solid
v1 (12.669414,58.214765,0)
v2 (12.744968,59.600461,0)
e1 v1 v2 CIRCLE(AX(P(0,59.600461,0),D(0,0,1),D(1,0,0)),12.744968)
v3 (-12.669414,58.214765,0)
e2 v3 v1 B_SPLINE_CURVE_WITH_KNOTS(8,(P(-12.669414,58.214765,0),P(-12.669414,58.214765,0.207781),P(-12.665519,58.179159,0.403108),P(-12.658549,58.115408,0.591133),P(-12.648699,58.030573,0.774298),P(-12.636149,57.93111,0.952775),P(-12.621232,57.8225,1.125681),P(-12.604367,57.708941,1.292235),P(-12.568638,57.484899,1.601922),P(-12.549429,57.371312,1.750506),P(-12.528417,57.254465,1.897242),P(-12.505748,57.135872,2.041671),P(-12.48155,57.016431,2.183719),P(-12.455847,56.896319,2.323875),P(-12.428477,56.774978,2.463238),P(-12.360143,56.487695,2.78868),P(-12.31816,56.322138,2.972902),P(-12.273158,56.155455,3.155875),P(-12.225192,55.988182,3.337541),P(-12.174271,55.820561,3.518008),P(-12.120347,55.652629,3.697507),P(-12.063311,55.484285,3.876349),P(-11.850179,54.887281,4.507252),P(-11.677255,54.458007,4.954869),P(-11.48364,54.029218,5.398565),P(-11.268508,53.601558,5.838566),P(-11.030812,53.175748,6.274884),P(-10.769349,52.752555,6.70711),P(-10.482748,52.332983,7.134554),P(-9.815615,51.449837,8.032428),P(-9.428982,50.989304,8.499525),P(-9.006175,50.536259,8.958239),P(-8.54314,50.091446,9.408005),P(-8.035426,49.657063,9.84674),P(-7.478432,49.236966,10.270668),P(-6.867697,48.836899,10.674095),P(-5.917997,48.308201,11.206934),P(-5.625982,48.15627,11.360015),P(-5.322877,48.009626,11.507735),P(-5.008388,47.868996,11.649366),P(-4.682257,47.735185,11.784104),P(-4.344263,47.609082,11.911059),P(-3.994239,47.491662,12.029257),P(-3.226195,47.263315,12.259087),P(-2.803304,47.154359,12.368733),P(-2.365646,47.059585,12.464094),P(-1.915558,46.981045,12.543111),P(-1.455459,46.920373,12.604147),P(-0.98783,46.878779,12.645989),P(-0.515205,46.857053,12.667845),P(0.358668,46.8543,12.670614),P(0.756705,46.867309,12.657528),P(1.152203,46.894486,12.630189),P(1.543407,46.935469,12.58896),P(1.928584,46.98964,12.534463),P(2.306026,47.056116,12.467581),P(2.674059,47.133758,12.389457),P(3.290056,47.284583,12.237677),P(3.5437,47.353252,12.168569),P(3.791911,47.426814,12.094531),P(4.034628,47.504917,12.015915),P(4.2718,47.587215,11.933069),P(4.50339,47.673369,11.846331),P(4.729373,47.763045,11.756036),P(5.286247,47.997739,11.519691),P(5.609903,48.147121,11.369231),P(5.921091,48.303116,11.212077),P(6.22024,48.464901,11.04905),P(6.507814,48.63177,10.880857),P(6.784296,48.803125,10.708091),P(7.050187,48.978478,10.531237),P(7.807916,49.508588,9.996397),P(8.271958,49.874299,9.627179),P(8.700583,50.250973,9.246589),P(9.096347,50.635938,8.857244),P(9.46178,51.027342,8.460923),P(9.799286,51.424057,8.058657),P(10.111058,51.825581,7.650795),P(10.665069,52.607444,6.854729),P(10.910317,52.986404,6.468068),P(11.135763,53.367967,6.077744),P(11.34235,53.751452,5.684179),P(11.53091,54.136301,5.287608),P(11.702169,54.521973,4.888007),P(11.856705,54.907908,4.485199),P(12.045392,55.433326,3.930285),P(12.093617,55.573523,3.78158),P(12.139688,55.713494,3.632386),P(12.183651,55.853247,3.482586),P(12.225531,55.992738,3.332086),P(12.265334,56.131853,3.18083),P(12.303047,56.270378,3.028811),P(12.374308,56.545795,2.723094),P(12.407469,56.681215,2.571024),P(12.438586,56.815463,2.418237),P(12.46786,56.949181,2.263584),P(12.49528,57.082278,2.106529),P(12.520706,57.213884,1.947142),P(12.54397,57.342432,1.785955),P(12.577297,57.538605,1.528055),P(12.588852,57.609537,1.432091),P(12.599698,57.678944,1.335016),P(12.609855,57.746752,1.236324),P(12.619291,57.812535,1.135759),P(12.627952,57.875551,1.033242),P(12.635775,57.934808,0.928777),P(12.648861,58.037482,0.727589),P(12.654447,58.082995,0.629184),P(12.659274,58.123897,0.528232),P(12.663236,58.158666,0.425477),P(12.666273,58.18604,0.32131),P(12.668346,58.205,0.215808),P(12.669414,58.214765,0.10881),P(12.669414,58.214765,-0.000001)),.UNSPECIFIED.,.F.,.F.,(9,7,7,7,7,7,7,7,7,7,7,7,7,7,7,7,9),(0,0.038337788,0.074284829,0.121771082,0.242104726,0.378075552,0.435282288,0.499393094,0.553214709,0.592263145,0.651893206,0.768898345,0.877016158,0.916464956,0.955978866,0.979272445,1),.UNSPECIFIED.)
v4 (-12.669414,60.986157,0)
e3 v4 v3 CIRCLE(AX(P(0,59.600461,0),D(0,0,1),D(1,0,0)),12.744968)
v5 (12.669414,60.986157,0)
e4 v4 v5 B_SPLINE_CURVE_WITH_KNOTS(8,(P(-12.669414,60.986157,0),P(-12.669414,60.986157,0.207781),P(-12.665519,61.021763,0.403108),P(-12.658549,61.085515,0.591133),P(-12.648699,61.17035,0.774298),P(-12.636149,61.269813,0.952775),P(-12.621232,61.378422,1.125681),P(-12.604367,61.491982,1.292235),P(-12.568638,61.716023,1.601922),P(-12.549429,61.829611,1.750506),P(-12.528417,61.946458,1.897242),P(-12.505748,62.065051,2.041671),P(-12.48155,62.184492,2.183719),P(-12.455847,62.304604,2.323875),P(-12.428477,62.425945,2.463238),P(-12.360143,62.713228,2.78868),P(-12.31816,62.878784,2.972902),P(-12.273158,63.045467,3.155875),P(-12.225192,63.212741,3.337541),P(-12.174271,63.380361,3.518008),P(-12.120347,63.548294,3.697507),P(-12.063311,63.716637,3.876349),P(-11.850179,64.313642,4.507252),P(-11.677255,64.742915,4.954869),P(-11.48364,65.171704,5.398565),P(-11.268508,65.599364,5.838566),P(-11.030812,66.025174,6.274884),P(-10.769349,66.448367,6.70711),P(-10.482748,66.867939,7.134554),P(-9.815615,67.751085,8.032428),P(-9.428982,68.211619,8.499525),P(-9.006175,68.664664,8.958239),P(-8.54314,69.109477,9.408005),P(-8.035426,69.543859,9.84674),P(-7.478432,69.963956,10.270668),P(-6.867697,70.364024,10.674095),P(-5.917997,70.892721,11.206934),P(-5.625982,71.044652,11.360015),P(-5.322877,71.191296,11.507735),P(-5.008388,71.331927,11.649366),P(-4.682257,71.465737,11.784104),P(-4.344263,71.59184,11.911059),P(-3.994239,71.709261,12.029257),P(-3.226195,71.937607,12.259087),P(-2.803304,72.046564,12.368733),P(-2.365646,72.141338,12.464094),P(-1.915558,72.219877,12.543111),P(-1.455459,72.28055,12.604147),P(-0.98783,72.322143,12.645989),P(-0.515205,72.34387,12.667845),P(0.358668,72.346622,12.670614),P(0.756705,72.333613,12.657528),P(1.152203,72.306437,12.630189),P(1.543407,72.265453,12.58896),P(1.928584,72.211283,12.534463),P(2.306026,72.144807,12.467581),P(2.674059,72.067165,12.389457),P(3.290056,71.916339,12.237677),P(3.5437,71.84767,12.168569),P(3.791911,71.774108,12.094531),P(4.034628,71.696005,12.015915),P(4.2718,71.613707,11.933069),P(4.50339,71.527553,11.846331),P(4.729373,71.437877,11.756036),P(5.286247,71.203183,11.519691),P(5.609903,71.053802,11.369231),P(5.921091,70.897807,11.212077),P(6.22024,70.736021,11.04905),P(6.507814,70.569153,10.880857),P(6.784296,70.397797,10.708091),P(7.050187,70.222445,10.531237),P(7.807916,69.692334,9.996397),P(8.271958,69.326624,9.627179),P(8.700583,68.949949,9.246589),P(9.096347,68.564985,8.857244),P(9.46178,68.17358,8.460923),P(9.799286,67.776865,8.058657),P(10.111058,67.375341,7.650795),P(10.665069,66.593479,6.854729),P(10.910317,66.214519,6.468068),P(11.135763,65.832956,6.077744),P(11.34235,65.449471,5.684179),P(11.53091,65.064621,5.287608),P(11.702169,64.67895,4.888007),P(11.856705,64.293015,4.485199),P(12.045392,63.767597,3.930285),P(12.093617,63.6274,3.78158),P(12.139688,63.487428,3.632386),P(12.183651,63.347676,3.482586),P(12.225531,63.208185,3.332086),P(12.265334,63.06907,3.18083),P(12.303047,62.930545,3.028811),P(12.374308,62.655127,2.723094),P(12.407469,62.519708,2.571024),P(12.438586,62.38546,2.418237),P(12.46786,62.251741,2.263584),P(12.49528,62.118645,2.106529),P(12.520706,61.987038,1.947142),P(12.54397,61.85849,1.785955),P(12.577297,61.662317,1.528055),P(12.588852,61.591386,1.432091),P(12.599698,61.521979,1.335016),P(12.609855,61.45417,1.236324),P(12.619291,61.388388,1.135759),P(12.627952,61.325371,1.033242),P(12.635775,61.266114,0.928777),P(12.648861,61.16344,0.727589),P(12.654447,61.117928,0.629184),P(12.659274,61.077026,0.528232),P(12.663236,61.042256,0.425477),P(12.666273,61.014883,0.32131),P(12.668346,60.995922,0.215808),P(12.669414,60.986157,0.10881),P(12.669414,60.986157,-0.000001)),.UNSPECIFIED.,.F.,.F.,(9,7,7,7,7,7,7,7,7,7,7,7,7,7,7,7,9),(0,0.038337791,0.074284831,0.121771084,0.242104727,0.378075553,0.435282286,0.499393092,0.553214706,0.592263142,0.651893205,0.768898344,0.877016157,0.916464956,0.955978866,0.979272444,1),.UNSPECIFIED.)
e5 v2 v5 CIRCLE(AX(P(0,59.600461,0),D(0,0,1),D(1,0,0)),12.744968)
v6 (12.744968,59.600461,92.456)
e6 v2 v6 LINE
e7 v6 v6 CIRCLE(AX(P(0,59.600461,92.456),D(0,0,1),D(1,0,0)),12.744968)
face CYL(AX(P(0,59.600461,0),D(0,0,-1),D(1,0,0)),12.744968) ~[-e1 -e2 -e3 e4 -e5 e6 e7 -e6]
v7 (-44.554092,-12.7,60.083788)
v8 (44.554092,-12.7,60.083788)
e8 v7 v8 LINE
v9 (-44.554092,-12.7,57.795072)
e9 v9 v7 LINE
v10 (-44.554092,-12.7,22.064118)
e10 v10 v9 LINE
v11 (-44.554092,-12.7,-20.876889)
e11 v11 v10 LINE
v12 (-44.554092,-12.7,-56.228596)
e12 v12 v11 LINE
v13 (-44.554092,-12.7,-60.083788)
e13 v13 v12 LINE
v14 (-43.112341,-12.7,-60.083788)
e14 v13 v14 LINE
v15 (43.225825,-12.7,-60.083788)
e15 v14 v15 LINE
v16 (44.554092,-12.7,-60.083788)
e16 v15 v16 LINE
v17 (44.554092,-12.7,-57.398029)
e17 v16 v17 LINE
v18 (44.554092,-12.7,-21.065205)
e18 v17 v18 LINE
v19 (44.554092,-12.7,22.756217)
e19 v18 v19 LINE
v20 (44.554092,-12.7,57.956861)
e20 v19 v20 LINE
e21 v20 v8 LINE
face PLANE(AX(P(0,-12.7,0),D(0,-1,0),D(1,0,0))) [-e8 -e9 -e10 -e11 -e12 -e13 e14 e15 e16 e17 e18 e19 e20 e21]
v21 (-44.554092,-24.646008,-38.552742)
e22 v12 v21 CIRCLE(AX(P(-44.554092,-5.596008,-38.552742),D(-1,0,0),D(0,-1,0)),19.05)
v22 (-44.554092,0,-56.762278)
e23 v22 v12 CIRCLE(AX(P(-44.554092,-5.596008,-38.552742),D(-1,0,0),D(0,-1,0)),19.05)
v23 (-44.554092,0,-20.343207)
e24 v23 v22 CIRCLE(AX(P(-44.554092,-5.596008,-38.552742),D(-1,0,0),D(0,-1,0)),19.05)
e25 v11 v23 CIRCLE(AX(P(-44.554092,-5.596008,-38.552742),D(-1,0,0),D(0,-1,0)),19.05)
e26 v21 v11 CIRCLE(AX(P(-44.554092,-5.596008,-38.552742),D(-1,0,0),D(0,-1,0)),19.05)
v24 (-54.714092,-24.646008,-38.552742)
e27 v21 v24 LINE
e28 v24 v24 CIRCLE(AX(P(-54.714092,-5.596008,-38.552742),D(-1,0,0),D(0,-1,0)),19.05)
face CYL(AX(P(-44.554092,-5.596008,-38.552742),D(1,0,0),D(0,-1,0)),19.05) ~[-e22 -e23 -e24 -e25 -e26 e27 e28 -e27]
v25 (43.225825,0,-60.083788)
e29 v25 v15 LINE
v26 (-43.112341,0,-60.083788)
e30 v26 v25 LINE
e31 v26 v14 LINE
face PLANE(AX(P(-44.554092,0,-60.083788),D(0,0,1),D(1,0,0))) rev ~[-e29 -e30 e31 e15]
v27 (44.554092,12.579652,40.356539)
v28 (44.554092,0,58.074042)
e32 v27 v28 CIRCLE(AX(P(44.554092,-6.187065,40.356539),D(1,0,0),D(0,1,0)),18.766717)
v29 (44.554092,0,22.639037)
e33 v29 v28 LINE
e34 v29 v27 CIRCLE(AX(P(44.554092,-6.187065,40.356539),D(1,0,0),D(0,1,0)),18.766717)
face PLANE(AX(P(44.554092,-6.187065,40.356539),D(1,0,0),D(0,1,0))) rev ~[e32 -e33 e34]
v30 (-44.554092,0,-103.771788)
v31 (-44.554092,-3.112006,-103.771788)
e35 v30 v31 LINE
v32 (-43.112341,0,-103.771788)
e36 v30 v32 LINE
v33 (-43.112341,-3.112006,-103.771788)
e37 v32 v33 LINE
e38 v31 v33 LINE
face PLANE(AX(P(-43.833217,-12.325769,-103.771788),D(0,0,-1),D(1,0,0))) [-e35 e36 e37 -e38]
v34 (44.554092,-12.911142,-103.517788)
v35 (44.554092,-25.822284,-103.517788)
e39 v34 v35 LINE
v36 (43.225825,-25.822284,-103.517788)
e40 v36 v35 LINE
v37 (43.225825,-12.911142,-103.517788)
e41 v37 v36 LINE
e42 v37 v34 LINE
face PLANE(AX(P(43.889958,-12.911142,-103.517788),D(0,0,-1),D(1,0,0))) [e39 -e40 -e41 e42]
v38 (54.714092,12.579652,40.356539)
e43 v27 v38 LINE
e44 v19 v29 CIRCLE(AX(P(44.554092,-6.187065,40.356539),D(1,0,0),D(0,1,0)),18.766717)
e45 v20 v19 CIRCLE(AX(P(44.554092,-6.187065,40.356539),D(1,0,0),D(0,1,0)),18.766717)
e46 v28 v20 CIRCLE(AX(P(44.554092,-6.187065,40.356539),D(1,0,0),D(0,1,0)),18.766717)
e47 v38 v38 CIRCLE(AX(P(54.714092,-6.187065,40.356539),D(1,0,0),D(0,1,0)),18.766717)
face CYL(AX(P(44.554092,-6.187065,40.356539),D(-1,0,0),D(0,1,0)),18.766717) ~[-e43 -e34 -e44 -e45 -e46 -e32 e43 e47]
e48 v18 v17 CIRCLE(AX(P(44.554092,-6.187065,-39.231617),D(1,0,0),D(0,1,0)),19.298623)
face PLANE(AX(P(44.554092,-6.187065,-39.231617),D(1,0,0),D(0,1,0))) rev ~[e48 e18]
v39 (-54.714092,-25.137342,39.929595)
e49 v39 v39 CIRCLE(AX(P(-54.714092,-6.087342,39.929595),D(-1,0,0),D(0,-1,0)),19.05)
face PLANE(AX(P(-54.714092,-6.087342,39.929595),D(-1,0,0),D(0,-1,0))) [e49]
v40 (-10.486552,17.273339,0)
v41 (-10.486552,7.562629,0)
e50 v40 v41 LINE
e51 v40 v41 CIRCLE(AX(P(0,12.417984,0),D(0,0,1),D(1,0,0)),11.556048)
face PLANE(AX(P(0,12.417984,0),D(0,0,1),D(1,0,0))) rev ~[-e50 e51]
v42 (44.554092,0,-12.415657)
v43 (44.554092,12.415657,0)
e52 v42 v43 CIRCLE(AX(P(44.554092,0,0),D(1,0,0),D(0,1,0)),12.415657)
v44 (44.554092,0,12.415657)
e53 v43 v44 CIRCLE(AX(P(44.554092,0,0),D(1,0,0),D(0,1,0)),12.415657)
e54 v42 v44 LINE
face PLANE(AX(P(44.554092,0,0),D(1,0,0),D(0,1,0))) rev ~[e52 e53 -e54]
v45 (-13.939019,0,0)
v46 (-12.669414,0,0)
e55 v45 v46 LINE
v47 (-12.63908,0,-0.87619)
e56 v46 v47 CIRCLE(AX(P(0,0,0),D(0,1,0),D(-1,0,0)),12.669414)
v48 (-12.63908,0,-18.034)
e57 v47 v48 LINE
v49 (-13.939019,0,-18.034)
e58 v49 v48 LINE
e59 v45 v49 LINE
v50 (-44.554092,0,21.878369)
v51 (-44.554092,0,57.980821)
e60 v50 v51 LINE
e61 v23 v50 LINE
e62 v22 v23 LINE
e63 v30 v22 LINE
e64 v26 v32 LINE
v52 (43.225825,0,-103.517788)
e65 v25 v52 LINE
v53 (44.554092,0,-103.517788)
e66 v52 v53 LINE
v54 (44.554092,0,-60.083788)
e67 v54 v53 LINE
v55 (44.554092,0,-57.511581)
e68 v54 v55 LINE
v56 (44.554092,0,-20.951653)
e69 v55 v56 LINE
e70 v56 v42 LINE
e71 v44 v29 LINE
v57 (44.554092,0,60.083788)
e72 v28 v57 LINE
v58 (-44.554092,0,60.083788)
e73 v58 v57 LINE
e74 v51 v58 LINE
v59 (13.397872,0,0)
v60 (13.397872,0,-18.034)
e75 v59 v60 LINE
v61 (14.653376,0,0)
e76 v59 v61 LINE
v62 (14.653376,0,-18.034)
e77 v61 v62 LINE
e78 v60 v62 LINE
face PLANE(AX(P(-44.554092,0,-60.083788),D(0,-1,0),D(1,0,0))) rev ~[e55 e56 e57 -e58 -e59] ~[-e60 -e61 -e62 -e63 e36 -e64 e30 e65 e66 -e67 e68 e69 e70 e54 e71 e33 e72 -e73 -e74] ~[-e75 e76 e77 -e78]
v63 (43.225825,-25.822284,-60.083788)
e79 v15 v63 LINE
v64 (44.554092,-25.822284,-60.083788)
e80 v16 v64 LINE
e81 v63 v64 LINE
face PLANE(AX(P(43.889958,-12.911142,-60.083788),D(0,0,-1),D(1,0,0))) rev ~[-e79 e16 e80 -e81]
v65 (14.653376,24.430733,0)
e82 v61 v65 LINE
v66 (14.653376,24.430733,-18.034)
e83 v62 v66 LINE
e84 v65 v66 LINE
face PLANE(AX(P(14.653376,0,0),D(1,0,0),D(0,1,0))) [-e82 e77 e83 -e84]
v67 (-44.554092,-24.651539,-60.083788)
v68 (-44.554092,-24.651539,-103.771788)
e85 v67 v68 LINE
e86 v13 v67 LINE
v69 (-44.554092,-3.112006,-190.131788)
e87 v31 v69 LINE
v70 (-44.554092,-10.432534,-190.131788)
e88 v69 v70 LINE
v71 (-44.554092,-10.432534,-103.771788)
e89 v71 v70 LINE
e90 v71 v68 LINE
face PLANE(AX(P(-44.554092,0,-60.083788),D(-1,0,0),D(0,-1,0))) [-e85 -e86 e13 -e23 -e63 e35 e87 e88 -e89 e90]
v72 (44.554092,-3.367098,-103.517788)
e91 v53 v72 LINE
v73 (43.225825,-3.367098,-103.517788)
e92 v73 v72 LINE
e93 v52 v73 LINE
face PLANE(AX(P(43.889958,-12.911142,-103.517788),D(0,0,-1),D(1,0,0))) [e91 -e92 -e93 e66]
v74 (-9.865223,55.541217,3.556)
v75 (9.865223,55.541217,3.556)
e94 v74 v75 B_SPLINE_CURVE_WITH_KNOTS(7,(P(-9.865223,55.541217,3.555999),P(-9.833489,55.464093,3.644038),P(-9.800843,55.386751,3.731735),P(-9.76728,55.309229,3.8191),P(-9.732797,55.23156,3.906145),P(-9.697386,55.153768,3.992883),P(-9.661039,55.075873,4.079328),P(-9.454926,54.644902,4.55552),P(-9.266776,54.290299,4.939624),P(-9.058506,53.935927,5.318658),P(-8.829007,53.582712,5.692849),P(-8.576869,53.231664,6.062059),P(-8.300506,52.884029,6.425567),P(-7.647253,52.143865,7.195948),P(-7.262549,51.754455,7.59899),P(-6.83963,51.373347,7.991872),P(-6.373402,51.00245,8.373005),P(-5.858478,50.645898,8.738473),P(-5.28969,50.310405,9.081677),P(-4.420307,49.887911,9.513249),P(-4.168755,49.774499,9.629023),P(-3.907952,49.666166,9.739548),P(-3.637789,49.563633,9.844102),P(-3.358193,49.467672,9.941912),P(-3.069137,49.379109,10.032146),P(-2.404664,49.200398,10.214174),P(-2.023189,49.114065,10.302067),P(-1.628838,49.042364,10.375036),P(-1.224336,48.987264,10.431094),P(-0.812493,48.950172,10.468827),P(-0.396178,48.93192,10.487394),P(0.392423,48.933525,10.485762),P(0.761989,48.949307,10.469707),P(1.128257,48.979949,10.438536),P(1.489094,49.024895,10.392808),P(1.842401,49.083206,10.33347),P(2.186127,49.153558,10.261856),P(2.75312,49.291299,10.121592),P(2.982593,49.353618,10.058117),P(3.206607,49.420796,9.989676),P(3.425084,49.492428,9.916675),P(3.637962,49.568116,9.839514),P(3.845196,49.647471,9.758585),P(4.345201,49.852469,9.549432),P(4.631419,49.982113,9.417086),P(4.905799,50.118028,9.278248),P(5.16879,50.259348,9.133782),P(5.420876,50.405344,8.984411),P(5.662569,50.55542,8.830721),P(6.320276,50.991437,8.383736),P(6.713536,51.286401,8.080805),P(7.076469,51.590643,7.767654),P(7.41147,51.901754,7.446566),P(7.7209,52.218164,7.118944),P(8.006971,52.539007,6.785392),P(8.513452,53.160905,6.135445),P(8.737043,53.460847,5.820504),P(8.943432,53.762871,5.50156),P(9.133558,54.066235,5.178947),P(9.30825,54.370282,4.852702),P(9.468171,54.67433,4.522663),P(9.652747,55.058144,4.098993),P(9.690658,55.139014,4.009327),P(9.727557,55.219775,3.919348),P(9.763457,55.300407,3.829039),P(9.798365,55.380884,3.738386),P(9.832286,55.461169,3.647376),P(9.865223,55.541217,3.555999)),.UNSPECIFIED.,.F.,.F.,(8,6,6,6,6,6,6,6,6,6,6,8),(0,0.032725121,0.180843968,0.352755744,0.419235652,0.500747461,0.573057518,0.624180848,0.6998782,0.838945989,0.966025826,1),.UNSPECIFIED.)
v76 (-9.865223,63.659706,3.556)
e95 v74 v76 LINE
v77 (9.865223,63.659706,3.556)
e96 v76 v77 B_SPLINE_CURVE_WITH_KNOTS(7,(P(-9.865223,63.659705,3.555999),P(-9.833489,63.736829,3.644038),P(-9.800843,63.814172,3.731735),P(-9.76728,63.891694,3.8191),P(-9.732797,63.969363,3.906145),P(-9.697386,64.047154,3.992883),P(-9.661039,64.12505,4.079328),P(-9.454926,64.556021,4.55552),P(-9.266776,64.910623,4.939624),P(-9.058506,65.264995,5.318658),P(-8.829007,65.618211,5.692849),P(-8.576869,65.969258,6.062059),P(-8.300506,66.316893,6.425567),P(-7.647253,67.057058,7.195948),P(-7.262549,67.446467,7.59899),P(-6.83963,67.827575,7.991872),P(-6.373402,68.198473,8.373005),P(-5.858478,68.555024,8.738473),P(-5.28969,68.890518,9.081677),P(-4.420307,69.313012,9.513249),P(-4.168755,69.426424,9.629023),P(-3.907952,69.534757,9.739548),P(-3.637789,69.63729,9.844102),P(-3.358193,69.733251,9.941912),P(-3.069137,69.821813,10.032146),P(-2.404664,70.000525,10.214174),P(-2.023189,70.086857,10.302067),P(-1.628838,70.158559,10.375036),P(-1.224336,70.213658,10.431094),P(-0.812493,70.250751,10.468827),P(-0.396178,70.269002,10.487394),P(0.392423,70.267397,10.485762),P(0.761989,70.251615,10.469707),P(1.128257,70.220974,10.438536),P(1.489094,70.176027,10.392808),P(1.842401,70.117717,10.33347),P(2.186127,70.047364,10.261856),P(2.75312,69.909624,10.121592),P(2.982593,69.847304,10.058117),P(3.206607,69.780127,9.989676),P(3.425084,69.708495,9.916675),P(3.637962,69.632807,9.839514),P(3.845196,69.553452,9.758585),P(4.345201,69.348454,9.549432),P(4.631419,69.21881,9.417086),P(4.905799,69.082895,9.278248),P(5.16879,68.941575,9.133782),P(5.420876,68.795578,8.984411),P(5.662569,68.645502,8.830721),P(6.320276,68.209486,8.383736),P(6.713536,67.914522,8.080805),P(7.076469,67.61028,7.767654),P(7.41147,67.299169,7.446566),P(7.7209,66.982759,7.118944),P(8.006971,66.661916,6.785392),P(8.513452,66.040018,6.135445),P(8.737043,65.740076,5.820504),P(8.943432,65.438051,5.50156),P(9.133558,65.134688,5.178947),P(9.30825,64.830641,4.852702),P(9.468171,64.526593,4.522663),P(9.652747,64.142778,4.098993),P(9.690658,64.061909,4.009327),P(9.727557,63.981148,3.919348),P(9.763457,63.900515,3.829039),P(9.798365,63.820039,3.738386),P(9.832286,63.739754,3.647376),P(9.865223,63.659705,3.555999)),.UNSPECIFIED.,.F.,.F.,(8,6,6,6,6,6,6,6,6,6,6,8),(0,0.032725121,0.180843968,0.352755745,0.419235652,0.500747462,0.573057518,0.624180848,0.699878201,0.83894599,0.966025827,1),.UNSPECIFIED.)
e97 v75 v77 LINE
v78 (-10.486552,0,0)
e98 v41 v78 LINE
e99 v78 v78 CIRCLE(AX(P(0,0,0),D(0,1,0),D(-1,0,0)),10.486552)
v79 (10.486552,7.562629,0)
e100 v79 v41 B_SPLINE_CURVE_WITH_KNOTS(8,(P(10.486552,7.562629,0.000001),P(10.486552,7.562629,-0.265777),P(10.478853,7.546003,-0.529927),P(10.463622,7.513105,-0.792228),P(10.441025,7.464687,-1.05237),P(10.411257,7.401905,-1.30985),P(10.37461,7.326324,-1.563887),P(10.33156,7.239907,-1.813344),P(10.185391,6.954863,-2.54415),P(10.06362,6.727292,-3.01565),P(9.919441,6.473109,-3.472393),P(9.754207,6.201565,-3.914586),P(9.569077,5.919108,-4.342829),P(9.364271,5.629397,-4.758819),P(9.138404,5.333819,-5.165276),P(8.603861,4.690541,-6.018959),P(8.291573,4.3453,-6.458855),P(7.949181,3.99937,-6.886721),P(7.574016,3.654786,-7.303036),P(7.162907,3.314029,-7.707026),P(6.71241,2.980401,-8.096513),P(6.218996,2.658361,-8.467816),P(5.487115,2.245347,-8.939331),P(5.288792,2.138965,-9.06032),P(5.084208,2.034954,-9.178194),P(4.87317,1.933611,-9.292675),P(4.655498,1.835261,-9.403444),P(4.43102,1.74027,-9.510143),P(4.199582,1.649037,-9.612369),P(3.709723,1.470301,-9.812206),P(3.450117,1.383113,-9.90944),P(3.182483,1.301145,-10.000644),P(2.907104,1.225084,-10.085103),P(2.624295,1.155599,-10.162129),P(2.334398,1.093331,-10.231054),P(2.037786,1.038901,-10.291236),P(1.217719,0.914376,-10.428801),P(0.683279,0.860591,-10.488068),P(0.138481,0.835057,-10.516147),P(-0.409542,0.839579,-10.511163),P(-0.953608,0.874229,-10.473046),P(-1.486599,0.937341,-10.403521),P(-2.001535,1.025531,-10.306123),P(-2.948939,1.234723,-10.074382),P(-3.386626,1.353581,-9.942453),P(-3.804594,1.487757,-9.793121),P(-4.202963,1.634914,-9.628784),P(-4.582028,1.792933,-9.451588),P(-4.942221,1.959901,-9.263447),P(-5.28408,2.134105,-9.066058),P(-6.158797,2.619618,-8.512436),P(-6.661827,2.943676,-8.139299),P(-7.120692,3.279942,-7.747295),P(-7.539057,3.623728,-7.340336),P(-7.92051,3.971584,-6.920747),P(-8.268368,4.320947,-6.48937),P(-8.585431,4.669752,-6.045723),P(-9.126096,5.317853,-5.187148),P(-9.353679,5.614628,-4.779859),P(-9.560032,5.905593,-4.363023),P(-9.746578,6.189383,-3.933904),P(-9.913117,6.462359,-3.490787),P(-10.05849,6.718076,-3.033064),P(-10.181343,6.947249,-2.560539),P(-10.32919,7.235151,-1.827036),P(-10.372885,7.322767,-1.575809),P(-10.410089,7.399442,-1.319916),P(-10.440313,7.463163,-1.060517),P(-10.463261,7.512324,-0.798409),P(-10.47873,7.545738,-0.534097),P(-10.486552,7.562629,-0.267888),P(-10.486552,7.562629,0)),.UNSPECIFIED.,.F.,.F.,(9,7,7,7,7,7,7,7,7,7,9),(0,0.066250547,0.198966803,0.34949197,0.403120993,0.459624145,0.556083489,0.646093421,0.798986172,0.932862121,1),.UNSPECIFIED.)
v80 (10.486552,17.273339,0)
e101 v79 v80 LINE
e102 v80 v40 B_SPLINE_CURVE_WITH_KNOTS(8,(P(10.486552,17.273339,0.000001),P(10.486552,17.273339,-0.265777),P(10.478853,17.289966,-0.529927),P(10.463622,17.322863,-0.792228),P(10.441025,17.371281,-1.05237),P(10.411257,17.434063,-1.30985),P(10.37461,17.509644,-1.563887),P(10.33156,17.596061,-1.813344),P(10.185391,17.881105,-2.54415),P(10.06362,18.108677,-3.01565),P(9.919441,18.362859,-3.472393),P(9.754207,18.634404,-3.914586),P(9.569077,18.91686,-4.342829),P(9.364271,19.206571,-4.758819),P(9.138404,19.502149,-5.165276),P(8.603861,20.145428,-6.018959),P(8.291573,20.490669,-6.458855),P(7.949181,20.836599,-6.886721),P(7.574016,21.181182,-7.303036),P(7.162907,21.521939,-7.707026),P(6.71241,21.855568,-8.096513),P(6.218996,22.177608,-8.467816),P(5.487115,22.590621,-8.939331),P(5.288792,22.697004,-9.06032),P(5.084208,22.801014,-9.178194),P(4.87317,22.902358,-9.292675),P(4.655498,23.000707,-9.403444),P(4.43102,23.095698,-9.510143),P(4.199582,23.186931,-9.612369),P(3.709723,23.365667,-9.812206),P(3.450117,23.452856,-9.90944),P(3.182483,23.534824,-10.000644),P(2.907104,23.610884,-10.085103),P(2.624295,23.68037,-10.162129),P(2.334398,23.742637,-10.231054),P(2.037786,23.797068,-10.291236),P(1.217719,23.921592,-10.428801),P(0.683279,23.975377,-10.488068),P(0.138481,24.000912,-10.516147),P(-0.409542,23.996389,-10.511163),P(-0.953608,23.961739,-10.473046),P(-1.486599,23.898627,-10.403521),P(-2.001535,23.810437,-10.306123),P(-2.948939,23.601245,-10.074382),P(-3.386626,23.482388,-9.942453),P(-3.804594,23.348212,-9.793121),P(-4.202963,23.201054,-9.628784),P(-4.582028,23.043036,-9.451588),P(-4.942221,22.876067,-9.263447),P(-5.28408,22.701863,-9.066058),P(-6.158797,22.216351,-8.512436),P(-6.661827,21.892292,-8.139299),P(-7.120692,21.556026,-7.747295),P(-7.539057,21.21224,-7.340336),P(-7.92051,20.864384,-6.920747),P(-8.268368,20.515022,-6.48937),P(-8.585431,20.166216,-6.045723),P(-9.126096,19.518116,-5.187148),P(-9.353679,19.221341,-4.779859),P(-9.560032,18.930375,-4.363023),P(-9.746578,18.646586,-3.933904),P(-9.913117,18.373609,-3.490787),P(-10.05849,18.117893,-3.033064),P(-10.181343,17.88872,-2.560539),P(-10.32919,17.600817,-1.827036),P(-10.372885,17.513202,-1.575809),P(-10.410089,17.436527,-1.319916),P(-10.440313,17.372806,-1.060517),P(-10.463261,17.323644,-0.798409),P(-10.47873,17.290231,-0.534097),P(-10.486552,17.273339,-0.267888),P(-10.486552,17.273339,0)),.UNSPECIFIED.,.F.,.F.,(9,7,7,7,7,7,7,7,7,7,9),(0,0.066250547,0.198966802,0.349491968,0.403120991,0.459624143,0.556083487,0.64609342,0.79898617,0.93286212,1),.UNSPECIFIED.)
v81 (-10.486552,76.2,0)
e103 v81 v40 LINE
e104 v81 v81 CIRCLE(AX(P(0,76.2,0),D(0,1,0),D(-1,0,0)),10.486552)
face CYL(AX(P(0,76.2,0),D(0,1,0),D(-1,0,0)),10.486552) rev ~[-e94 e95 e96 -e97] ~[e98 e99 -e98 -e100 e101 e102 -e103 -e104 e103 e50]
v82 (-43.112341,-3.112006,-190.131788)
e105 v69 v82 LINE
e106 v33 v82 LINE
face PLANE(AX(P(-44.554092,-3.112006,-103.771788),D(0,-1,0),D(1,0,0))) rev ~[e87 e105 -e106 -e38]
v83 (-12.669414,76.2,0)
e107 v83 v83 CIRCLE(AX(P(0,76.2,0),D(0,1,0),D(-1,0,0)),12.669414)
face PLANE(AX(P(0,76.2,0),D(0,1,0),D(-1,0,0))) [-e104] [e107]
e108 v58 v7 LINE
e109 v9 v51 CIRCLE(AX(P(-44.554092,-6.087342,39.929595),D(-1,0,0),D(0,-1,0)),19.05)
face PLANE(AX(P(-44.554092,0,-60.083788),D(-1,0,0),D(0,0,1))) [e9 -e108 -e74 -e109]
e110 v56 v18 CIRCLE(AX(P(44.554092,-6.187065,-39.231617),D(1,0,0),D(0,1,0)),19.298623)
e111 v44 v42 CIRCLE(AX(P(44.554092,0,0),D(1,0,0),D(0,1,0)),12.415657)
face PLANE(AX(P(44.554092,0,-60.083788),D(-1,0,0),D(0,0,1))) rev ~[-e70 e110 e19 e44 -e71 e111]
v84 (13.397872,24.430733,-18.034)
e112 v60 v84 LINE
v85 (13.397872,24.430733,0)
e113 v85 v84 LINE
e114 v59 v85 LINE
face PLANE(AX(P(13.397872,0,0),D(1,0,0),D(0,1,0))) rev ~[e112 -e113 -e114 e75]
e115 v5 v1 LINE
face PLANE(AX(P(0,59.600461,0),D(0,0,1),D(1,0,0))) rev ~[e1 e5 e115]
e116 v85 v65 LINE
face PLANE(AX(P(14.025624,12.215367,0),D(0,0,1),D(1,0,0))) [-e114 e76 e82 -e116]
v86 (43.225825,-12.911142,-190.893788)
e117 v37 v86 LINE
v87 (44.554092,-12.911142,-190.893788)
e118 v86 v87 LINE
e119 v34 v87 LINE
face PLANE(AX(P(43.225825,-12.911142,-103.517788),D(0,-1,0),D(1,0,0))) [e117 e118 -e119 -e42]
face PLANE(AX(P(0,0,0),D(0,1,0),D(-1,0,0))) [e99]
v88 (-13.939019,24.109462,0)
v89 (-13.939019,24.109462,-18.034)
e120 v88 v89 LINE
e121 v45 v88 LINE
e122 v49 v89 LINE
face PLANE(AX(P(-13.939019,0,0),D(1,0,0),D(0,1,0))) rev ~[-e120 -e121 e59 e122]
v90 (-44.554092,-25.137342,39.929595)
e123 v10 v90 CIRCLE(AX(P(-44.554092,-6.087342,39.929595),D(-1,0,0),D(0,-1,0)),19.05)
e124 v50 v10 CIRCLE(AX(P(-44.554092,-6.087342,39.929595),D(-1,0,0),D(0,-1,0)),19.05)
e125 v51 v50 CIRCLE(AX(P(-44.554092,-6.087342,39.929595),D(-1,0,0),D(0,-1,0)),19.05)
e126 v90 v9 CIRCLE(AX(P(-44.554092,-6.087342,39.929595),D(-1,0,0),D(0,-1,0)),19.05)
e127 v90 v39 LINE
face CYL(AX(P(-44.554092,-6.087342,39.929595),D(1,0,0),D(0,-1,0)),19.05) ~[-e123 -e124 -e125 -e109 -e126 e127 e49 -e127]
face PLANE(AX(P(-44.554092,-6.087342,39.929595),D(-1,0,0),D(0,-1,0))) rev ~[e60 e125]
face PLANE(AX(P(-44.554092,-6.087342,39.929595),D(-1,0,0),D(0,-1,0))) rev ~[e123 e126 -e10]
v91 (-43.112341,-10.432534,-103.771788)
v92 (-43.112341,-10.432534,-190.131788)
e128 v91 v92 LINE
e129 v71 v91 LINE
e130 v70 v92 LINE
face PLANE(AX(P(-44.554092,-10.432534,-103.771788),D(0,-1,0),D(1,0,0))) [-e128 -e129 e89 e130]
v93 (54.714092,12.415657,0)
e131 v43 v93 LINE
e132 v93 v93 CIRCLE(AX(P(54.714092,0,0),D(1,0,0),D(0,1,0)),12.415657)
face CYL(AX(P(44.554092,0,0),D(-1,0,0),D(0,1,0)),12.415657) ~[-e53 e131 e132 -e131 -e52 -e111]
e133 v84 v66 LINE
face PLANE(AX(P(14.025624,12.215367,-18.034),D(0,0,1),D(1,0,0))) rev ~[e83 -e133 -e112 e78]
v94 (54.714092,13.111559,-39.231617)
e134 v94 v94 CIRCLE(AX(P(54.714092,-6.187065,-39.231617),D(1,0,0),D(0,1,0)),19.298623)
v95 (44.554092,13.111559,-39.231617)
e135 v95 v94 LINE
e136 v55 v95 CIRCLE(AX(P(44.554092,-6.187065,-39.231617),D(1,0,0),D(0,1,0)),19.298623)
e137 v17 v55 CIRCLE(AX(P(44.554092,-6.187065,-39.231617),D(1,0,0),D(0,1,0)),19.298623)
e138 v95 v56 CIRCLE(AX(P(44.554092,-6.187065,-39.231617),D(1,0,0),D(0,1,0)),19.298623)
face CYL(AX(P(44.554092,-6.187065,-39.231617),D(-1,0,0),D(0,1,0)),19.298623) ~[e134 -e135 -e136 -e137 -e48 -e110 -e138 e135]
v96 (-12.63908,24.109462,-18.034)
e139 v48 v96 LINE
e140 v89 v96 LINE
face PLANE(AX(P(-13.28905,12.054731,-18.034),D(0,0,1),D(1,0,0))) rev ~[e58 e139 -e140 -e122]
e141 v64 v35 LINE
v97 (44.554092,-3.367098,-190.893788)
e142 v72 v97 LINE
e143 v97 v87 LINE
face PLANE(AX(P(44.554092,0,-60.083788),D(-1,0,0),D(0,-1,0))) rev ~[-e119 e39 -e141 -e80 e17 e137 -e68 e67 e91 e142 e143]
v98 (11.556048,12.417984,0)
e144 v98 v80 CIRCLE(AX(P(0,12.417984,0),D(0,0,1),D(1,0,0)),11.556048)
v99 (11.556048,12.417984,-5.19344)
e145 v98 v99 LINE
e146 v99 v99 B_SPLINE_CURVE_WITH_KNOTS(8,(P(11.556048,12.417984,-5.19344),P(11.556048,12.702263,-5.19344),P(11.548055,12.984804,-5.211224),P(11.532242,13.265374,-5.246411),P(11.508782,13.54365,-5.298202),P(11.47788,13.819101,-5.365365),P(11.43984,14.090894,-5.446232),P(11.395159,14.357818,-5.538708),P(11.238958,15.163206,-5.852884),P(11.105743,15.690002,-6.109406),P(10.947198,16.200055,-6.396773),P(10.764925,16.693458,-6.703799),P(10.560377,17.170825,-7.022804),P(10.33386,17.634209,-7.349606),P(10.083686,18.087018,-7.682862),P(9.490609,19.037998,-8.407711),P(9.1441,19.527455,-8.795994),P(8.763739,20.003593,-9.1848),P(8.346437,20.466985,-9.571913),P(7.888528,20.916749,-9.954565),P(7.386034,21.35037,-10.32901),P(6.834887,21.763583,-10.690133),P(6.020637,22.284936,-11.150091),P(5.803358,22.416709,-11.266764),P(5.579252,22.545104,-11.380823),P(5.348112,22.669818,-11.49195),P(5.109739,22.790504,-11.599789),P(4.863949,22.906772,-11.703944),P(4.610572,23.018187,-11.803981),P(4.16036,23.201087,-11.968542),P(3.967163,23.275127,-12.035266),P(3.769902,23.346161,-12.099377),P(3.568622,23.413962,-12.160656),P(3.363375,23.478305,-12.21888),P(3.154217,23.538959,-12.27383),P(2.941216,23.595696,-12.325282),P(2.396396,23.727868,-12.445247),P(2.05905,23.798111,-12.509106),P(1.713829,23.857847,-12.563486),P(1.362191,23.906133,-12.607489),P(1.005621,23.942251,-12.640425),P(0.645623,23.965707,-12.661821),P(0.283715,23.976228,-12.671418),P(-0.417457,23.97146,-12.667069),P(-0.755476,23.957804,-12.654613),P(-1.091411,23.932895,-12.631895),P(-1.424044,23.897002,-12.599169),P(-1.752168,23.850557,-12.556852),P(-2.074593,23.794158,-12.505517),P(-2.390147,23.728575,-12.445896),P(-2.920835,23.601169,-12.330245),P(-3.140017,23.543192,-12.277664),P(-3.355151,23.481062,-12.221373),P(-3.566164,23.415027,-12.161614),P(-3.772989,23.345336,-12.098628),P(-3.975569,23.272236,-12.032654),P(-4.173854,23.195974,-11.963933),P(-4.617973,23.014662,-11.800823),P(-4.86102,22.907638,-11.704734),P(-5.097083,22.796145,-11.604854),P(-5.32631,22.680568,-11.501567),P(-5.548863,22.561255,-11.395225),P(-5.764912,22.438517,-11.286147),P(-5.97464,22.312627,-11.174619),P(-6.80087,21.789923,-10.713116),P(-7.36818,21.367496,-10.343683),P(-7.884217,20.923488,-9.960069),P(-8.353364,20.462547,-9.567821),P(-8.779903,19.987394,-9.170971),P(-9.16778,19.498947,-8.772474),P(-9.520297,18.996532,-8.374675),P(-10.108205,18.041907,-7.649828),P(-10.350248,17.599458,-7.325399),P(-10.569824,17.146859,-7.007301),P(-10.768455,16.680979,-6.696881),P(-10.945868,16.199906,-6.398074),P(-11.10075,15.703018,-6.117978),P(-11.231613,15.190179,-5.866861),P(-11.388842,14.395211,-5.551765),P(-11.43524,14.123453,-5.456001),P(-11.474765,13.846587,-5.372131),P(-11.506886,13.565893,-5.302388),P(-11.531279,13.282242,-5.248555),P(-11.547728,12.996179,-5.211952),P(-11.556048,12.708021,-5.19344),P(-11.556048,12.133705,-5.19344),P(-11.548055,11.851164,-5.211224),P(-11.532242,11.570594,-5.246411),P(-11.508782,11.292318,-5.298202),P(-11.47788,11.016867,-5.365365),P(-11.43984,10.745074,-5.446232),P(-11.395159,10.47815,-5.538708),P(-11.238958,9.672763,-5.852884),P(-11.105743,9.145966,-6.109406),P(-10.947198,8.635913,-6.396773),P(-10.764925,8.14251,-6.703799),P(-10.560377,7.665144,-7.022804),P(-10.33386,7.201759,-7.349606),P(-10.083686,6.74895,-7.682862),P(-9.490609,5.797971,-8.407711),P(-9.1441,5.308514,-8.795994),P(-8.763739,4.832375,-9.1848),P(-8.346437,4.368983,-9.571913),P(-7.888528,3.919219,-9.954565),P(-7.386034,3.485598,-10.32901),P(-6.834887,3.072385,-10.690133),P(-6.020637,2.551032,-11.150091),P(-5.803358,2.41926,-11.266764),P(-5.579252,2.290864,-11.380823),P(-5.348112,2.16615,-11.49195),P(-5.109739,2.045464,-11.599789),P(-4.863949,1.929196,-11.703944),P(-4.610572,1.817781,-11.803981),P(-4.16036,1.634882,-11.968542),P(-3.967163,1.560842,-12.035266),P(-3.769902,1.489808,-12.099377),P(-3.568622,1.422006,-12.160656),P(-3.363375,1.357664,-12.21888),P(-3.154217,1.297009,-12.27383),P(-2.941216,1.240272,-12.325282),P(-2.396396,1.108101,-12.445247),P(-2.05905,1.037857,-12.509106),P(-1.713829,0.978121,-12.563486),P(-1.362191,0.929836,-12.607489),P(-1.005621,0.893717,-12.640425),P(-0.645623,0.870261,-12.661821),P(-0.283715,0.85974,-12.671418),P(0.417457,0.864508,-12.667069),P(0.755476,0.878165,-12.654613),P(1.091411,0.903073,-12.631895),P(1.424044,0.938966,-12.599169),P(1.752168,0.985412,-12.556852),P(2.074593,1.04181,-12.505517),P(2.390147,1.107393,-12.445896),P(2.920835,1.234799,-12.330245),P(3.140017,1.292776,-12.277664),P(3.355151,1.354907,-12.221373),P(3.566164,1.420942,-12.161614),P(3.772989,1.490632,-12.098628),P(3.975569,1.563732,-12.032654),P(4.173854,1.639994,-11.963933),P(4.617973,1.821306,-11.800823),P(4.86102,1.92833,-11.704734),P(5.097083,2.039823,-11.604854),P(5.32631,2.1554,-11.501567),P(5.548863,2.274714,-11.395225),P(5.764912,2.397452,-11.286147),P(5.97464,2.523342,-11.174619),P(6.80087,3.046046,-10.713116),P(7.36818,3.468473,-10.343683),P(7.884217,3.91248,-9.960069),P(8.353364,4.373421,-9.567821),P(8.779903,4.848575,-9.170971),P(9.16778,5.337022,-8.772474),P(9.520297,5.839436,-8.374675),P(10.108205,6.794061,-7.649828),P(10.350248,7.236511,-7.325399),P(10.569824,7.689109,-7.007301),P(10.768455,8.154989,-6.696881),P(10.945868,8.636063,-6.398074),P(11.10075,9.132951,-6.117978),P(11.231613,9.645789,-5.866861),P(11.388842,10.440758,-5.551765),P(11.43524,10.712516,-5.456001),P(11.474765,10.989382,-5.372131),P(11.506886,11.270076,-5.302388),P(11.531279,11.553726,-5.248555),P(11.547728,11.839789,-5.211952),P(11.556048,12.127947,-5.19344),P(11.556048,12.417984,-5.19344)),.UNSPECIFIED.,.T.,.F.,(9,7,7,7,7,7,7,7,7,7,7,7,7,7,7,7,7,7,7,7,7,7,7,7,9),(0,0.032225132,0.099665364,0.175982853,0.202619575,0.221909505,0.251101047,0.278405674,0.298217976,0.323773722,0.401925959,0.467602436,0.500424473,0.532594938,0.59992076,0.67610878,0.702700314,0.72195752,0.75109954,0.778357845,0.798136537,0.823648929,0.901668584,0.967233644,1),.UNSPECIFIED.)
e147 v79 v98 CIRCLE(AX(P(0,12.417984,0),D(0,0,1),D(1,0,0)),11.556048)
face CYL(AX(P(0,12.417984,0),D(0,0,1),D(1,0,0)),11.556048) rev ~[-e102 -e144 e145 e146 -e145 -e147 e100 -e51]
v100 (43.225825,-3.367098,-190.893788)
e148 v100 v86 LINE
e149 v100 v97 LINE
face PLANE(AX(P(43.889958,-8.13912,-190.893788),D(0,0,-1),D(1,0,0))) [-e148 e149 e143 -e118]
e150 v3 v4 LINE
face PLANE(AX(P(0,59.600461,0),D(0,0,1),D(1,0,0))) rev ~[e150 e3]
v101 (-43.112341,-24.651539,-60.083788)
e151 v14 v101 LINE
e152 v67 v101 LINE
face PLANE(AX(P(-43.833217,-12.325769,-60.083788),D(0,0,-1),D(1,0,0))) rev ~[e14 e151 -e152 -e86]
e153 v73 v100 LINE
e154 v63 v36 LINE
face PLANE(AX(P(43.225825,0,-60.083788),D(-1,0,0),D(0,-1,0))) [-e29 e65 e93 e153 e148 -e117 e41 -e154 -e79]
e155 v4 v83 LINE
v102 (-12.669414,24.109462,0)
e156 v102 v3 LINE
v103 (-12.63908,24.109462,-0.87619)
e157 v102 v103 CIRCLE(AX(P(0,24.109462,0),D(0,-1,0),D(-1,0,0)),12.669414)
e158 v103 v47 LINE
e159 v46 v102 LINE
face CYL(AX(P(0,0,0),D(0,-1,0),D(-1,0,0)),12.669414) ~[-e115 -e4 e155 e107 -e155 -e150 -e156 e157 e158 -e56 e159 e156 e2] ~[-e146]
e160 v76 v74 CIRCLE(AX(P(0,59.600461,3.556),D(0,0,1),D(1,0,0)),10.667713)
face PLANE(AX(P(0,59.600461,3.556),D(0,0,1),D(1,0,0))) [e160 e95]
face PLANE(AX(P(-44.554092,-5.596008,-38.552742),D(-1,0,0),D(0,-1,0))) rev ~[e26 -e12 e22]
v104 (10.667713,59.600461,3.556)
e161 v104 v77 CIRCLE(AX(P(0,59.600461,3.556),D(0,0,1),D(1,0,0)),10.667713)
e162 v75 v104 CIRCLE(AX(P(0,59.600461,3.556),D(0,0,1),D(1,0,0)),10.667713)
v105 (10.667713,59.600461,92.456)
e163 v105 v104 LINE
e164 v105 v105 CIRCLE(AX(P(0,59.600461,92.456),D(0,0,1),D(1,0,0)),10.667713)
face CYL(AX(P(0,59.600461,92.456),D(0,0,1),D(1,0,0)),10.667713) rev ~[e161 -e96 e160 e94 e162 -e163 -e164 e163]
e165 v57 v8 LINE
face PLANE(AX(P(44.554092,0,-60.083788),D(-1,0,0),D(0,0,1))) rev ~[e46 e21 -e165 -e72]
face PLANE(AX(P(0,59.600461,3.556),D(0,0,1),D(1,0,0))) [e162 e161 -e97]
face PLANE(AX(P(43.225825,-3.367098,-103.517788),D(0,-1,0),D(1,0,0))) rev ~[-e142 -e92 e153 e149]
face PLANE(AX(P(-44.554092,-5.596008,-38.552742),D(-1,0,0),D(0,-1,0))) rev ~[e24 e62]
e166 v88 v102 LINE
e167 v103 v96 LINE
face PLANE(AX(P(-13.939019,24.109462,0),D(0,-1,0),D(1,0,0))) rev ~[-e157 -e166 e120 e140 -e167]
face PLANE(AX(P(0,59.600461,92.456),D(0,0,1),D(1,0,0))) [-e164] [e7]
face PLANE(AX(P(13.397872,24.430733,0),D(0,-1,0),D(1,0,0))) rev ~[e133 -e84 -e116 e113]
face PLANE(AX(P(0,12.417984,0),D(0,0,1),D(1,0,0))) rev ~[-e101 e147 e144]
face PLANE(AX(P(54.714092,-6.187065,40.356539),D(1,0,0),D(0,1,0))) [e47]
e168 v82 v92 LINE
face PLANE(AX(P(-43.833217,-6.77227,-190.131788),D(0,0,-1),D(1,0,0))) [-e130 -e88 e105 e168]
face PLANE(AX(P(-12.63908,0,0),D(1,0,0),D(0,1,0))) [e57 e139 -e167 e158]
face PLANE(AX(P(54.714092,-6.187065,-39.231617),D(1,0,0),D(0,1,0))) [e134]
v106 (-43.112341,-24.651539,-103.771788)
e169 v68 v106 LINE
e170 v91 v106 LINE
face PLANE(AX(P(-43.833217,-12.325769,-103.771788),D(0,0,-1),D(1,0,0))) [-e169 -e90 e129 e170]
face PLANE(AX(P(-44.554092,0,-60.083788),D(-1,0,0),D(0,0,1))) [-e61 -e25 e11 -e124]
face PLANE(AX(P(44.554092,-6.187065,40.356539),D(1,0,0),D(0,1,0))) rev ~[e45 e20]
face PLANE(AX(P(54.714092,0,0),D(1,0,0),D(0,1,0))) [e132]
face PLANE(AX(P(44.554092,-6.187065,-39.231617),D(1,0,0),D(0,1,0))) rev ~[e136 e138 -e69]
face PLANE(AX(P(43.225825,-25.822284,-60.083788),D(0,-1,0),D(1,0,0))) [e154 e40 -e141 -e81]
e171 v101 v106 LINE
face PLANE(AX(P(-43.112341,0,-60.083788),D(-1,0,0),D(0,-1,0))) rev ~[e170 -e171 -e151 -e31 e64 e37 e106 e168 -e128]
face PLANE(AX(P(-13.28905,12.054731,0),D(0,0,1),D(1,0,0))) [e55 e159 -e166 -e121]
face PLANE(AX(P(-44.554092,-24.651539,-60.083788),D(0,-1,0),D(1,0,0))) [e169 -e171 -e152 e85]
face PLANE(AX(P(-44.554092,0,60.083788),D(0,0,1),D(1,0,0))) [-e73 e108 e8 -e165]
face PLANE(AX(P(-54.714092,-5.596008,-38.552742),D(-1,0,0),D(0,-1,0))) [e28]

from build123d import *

# Parameters (mm, degrees)
F0_W      = 89.10818398
F0_H      = 120.1675757766
F1_DEPTH  = 12.7
F2_R      = 19.05
F3_DEPTH  = 10.16
F4_R      = 19.05
F5_DEPTH  = 10.16
F6_R      = 18.7667167596
F7_DEPTH  = 10.16
F8_R      = 19.2986234131
F9_DEPTH  = 10.16
F10_R     = 12.4156573735
F11_DEPTH = 10.16
F12_R     = 12.6694142054
F13_DEPTH = 76.2
F14_R     = 12.7449680287
F15_DEPTH = 92.456
F16_R     = 10.4865516495
F17_DEPTH = 76.2
F18_R     = 10.6677127508
F19_DEPTH = 88.9
F20_R     = 11.5560475943
F21_DEPTH = 25.4
F24_W     = 1.3282671571
F24_H     = 25.8222837001
F25_DEPTH = 43.434
F26_W     = 1.4417506754
F26_H     = 24.6515385807
F27_DEPTH = 43.688
F22_W     = 1.255504787
F22_H     = 24.4307331741
F30_DEPTH = 18.034
F23_W     = 1.2999391183
F23_H     = 24.1094622761
F31_DEPTH = 18.034
F36_W     = 1.3282671571
F36_H     = 9.5440435689
F37_DEPTH = 87.376
F38_W     = 1.4417506754
F38_H     = 7.3205276858
F39_DEPTH = 86.36


# Not quite as in the source:
# - the program builds the solid bodies; features that only make, move or delete a surface that nothing else refers to are left out


with BuildPart() as f1:
    # F0 (on Front) → F1 (new body)
    with BuildSketch(Plane.XZ):
        Rectangle(F0_W, F0_H)
    extrude(amount=F1_DEPTH)

    # F2 (on face) → F3 (join)
    with BuildSketch(Plane(origin=(-44.55409199, 0, 0), x_dir=(0, -1, 0), z_dir=(-1, 0, 0))):
        with Locations((6.0873422772, 39.9295948446)):
            Circle(F2_R)
    extrude(amount=F3_DEPTH)

    # F4 (on face) → F5 (join)
    with BuildSketch(Plane(origin=(-44.55409199, 0, 0), x_dir=(0, -1, 0), z_dir=(-1, 0, 0))):
        with Locations((5.5960081518, -38.5527424514)):
            Circle(F4_R)
    extrude(amount=F5_DEPTH)

    # F6 (on face) → F7 (join)
    with BuildSketch(Plane.YZ.offset(44.55409199)):
        with Locations((-6.1870645732, 40.3565391898)):
            Circle(F6_R)
    extrude(amount=F7_DEPTH)

    # F8 (on face) → F9 (join)
    with BuildSketch(Plane.YZ.offset(44.55409199)):
        with Locations((-6.1870645732, -39.2316170037)):
            Circle(F8_R)
    extrude(amount=F9_DEPTH)

    # F10 (on face) → F11 (join)
    with BuildSketch(Plane.YZ.offset(44.55409199)):
        Circle(F10_R)
    extrude(amount=F11_DEPTH)

    # F12 (on face) → F13 (join)
    with BuildSketch(Plane(origin=(0, 0, 0), x_dir=(-1, 0, 0), z_dir=(0, 1, 0))):
        Circle(F12_R)
    extrude(amount=F13_DEPTH)

    # F14 (on Top) → F15 (join)
    with BuildSketch(Plane.XY):
        with Locations((0, 59.6004612744)):
            Circle(F14_R)
    extrude(amount=F15_DEPTH)

    # F16 (on face) → F17 (cut)
    with BuildSketch(Plane(origin=(0, 76.2, 0), x_dir=(-1, 0, 0), z_dir=(0, 1, 0))):
        Circle(F16_R)
    extrude(amount=-F17_DEPTH, mode=Mode.SUBTRACT)

    # F18 (on face) → F19 (cut)
    with BuildSketch(Plane.XY.offset(92.456)):
        with Locations((0, 59.6004612744)):
            Circle(F18_R)
    extrude(amount=-F19_DEPTH, mode=Mode.SUBTRACT)

    # F20 (on Top) → F21 (cut)
    with BuildSketch(Plane.XY):
        with Locations((0, 12.4179841951)):
            Circle(F20_R)
    extrude(amount=-F21_DEPTH, mode=Mode.SUBTRACT)

    # F24 (on face) → F25 (join)
    with BuildSketch(Plane(origin=(0, 0, -60.0837878883), x_dir=(1, 0, 0), z_dir=(0, 0, -1))):
        with Locations((43.8899584115, 12.9111418501)):
            Rectangle(F24_W, F24_H)
    extrude(amount=F25_DEPTH)

    # F26 (on face) → F27 (join)
    with BuildSketch(Plane(origin=(0, 0, -60.0837878883), x_dir=(1, 0, 0), z_dir=(0, 0, -1))):
        with Locations((-43.8332166523, 12.3257692903)):
            Rectangle(F26_W, F26_H)
    extrude(amount=F27_DEPTH)

    # F22 (on Top) → F30 (join)
    with BuildSketch(Plane.XY):
        with Locations((14.0256239101, 12.215366587)):
            Rectangle(F22_W, F22_H)
    extrude(amount=-F30_DEPTH)

    # F23 (on Top) → F31 (join)
    with BuildSketch(Plane.XY):
        with Locations((-13.2890497334, 12.0547311381)):
            Rectangle(F23_W, F23_H)
    extrude(amount=-F31_DEPTH)

    # F36 (on face) → F37 (join)
    with BuildSketch(Plane(origin=(0, 0, -103.5177878883), x_dir=(1, 0, 0), z_dir=(0, 0, -1))):
        with Locations((43.8899584115, 8.1391200656)):
            Rectangle(F36_W, F36_H)
    extrude(amount=F37_DEPTH)

    # F38 (on face) → F39 (join)
    with BuildSketch(Plane(origin=(0, 0, -103.7717878883), x_dir=(1, 0, 0), z_dir=(0, 0, -1))):
        with Locations((-43.8332166523, 6.7722700769)):
            Rectangle(F38_W, F38_H)
    extrude(amount=F39_DEPTH)


solid = f1.part
